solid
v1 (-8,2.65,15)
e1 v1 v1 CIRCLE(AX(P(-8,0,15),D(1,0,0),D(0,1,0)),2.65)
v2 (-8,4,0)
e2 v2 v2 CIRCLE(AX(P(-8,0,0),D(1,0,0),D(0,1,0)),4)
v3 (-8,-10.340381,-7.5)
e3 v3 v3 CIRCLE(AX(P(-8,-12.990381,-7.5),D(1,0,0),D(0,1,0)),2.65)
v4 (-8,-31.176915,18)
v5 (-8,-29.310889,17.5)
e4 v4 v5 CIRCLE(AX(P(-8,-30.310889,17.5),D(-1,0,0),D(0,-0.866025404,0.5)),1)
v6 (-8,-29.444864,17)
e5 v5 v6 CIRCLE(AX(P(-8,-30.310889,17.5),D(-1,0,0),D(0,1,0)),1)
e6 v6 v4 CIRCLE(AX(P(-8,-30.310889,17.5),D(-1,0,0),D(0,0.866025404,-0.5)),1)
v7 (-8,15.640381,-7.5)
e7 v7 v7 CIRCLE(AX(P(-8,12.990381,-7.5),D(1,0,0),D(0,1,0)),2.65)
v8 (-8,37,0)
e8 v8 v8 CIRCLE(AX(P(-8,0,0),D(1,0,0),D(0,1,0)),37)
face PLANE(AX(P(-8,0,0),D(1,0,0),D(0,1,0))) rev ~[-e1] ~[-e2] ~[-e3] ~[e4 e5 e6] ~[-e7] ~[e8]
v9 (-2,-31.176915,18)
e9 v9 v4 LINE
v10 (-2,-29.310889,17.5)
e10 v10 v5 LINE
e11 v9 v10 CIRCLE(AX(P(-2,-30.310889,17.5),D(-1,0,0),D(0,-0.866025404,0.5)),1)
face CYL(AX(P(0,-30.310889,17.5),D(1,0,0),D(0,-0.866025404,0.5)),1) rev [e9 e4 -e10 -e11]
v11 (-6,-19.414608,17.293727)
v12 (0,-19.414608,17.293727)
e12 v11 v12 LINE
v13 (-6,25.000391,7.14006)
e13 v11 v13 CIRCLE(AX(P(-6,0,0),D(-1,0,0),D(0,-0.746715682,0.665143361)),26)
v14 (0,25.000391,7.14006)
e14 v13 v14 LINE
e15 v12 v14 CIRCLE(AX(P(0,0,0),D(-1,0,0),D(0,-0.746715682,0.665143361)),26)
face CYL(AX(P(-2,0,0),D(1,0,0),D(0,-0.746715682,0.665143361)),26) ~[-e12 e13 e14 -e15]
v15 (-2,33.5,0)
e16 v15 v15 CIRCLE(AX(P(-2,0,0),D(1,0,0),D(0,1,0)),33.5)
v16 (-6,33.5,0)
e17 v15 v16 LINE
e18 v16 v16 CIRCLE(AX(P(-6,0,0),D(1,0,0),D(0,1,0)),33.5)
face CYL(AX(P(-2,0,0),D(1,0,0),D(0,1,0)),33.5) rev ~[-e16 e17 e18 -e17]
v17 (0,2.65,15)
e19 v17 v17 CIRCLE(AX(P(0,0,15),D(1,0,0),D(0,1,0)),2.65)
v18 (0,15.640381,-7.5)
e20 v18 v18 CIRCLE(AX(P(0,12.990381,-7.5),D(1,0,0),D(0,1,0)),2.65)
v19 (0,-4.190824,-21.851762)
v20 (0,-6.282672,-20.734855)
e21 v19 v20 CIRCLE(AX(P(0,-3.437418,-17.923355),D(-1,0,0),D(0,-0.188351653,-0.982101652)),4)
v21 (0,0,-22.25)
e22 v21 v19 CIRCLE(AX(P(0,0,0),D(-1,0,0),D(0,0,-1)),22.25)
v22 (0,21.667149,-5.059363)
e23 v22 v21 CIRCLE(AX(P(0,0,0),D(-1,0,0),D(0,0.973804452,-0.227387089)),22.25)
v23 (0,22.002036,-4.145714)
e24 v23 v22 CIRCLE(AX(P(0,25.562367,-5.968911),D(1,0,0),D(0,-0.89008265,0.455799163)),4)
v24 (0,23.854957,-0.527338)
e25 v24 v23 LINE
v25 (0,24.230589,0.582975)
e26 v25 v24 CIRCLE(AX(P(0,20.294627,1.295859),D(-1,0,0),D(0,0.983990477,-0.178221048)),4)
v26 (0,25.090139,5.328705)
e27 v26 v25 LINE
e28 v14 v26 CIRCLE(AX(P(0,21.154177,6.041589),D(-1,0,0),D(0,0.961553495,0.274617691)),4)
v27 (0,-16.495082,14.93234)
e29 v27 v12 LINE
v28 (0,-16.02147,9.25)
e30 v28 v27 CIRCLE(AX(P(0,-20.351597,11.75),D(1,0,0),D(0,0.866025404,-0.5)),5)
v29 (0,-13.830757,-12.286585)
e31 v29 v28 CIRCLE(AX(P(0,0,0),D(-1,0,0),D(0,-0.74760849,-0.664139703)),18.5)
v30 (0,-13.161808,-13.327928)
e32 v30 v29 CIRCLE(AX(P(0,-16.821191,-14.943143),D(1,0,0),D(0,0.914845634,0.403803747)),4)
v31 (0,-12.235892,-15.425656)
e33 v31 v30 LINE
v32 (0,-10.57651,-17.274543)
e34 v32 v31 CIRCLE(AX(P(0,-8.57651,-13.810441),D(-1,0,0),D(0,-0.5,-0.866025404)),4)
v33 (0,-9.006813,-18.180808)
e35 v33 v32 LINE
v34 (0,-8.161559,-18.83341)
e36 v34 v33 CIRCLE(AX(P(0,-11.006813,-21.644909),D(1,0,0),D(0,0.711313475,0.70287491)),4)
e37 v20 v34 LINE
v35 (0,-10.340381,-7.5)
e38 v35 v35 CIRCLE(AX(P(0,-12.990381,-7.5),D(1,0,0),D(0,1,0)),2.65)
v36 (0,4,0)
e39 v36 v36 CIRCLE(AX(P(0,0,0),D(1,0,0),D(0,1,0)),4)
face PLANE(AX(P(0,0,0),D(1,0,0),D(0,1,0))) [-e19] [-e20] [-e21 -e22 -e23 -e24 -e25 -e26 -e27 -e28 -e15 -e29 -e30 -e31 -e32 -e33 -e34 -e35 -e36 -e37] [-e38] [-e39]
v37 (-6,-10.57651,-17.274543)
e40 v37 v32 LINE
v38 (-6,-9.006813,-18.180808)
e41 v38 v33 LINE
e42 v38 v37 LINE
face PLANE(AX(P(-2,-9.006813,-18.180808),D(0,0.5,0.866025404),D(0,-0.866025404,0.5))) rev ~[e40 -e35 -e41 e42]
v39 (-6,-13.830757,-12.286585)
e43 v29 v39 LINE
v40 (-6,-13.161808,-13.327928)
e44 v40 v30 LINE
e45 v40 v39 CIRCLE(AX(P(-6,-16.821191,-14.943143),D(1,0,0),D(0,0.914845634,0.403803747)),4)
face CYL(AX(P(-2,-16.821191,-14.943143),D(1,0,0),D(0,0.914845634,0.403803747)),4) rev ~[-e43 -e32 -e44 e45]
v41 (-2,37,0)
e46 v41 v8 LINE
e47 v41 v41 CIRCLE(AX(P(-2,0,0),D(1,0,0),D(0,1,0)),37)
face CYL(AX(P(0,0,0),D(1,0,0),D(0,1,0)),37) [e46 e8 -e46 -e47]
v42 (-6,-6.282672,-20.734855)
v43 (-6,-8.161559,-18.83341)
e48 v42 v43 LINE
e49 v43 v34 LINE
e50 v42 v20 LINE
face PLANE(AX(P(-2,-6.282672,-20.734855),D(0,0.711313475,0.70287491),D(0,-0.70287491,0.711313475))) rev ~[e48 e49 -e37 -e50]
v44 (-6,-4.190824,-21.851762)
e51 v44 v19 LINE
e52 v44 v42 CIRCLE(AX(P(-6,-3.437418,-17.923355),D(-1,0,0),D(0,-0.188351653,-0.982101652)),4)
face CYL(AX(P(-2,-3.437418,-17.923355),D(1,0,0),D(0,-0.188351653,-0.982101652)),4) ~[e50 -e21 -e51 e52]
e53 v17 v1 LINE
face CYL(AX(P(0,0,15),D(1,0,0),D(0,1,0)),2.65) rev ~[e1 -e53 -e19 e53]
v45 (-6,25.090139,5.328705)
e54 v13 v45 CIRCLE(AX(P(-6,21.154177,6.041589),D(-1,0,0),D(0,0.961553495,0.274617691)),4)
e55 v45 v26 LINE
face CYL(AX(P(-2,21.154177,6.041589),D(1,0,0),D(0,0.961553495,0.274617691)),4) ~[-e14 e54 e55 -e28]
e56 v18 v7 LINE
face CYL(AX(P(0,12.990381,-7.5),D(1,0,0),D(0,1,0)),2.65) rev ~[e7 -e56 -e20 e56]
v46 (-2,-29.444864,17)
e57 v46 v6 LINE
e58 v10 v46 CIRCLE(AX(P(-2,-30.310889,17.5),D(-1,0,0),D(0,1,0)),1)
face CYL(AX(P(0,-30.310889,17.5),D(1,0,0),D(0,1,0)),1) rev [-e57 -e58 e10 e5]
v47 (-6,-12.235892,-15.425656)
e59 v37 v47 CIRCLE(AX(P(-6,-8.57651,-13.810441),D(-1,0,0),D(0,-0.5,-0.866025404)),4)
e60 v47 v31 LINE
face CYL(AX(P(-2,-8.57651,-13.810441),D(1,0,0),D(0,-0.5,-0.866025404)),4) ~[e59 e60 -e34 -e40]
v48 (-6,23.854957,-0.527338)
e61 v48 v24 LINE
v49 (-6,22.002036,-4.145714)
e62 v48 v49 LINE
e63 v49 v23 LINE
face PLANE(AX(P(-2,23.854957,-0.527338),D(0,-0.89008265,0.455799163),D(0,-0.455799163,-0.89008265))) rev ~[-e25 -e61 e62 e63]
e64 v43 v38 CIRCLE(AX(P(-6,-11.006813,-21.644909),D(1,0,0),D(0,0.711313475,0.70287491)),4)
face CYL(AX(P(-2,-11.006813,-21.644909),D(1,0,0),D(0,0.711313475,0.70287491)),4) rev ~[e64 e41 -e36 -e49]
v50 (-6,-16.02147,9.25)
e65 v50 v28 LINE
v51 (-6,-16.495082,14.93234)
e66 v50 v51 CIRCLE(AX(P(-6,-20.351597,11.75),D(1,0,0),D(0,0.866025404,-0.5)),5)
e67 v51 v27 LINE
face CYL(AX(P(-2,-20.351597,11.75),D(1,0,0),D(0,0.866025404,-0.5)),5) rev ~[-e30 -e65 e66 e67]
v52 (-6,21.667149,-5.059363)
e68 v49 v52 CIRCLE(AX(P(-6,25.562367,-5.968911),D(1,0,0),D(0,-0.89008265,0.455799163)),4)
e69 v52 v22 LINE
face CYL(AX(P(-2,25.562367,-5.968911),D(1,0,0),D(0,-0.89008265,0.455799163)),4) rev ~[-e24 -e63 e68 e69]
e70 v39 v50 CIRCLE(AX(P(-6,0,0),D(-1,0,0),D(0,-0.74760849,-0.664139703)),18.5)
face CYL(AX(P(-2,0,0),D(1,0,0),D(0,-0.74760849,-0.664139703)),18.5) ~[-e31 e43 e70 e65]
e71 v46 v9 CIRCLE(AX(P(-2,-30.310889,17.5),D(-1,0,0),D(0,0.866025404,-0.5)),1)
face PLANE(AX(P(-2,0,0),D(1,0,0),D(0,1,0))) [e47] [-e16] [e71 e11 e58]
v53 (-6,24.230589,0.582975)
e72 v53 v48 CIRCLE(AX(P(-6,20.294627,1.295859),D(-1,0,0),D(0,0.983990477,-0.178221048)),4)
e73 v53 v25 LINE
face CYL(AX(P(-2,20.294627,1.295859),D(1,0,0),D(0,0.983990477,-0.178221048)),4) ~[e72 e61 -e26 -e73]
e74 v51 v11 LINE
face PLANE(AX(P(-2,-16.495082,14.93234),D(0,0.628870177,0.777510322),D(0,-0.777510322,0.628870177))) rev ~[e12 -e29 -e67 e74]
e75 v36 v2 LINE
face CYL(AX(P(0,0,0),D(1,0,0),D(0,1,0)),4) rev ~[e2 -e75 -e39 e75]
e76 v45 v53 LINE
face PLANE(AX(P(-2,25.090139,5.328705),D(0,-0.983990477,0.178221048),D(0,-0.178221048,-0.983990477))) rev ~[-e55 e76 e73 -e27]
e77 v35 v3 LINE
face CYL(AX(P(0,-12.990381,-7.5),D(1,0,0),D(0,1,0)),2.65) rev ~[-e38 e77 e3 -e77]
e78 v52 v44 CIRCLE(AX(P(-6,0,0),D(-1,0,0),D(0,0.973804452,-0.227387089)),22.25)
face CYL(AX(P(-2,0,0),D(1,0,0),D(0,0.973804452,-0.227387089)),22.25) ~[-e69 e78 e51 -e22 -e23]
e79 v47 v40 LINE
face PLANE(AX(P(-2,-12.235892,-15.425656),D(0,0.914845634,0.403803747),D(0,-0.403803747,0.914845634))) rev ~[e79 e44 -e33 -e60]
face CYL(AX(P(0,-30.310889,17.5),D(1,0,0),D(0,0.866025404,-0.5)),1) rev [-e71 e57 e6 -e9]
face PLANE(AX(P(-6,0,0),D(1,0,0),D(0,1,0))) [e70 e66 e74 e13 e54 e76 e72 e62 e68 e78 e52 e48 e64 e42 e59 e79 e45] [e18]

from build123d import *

# Parameters (mm, degrees)
F0_R     = 37
F0_R_2   = 2.65
F0_R_3   = 4
F1_DEPTH = 8
F2_DEPTH = 2
F3_R     = 33.5
F4_DEPTH = 4


# Not quite as in the source:
# - a feature names something its author has since deleted; it is built from what else it names


with BuildPart() as f1:
    # F0 (on Right) → F1 (new body)
    with BuildSketch(Plane.YZ):
        Circle(F0_R)
        with BuildLine():
            ThreePointArc((-31.1769145362, 18), (-30.0520700874, 18.4659258263), (-29.3108891325, 17.5))
            ThreePointArc((-29.3108891325, 17.5), (-29.3449633062, 17.2411809549), (-29.4448637287, 17))
            ThreePointArc((-29.4448637287, 17), (-30.8108891325, 16.6339745962), (-31.1769145362, 18))
        make_face(mode=Mode.SUBTRACT)
        with BuildLine():
            ThreePointArc((-13.8307570654, -12.2865845131), (-18.4050260219, -1.8721690986), (-16.02146997, 9.25))
            ThreePointArc((-16.02146997, 9.25), (-15.3688742415, 12.1652999186), (-16.4950815942, 14.9323401783))
            Line((-16.4950815942, 14.9323401783), (-19.414607735, 17.2937273743))
            ThreePointArc((-19.414607735, 17.2937273743), (5.7943493018, 25.3461144195), (25.0003908736, 7.1400599553))
            ThreePointArc((25.0003908736, 7.1400599553), (25.1492760253, 6.2395359628), (25.0901387998, 5.3287050027))
            Line((25.0901387998, 5.3287050027), (24.230588756, 0.582974524))
            ThreePointArc((24.230588756, 0.582974524), (24.0836635039, 0.0139846058), (23.8549574473, -0.527337938))
            Line((23.8549574473, -0.527337938), (22.0020362781, -4.1457144451))
            ThreePointArc((22.0020362781, -4.1457144451), (21.8067059734, -4.5923170456), (21.6671490665, -5.0593627397))
            ThreePointArc((21.6671490665, -5.0593627397), (13.8291662627, -17.4303373599), (0, -22.25))
            ThreePointArc((0, -22.25), (-2.1048516517, -22.1502166925), (-4.1908242867, -21.851761755))
            ThreePointArc((-4.1908242867, -21.851761755), (-5.3214186468, -21.4518874672), (-6.2826715748, -20.7348547893))
            Line((-6.2826715748, -20.7348547893), (-8.1615589997, -18.8334098464))
            ThreePointArc((-8.1615589997, -18.8334098464), (-8.5623101549, -18.4787752012), (-9.0068129011, -18.1808078731))
            Line((-9.0068129011, -18.1808078731), (-10.5765097016, -17.2745430028))
            ThreePointArc((-10.5765097016, -17.2745430028), (-11.5533785454, -16.4821921034), (-12.2358922377, -15.4256563749))
            Line((-12.2358922377, -15.4256563749), (-13.1618084894, -13.3279283396))
            ThreePointArc((-13.1618084894, -13.3279283396), (-13.4557617662, -12.781226145), (-13.8307570654, -12.2865845131))
        make_face(mode=Mode.SUBTRACT)
        with BuildLine():
            ThreePointArc((-16.4950815942, 14.9323401783), (-15.3688742415, 12.1652999186), (-16.02146997, 9.25))
            ThreePointArc((-16.02146997, 9.25), (-18.4050260219, -1.8721690986), (-13.8307570654, -12.2865845131))
            ThreePointArc((-13.8307570654, -12.2865845131), (-13.4557617662, -12.781226145), (-13.1618084894, -13.3279283396))
            Line((-13.1618084894, -13.3279283396), (-12.2358922377, -15.4256563749))
            ThreePointArc((-12.2358922377, -15.4256563749), (-11.5533785454, -16.4821921034), (-10.5765097016, -17.2745430028))
            Line((-10.5765097016, -17.2745430028), (-9.0068129011, -18.1808078731))
            ThreePointArc((-9.0068129011, -18.1808078731), (-8.5623101549, -18.4787752012), (-8.1615589997, -18.8334098464))
            Line((-8.1615589997, -18.8334098464), (-6.2826715748, -20.7348547893))
            ThreePointArc((-6.2826715748, -20.7348547893), (-5.3214186468, -21.4518874672), (-4.1908242867, -21.851761755))
            ThreePointArc((-4.1908242867, -21.851761755), (-2.1048516517, -22.1502166925), (0, -22.25))
            ThreePointArc((0, -22.25), (13.8291662627, -17.4303373599), (21.6671490665, -5.0593627397))
            ThreePointArc((21.6671490665, -5.0593627397), (21.8067059734, -4.5923170456), (22.0020362781, -4.1457144451))
            Line((22.0020362781, -4.1457144451), (23.8549574473, -0.527337938))
            ThreePointArc((23.8549574473, -0.527337938), (24.0836635039, 0.0139846058), (24.230588756, 0.582974524))
            Line((24.230588756, 0.582974524), (25.0901387998, 5.3287050027))
            ThreePointArc((25.0901387998, 5.3287050027), (25.1492760253, 6.2395359628), (25.0003908736, 7.1400599553))
            ThreePointArc((25.0003908736, 7.1400599553), (5.7943493018, 25.3461144195), (-19.414607735, 17.2937273743))
            Line((-19.414607735, 17.2937273743), (-16.4950815942, 14.9323401783))
        make_face()
        with Locations((-12.9903810568, -7.5)):
            Circle(F0_R_2, mode=Mode.SUBTRACT)
        with Locations((12.9903810568, -7.5)):
            Circle(F0_R_2, mode=Mode.SUBTRACT)
        Circle(F0_R_3, mode=Mode.SUBTRACT)
        with Locations((0, 15)):
            Circle(F0_R_2, mode=Mode.SUBTRACT)
    extrude(amount=-F1_DEPTH)

    # F0 (on Right) → F2 (cut)
    with BuildSketch(Plane.YZ):
        Circle(F0_R)
        with BuildLine():
            ThreePointArc((-31.1769145362, 18), (-30.0520700874, 18.4659258263), (-29.3108891325, 17.5))
            ThreePointArc((-29.3108891325, 17.5), (-29.3449633062, 17.2411809549), (-29.4448637287, 17))
            ThreePointArc((-29.4448637287, 17), (-30.8108891325, 16.6339745962), (-31.1769145362, 18))
        make_face(mode=Mode.SUBTRACT)
        with BuildLine():
            ThreePointArc((-13.8307570654, -12.2865845131), (-18.4050260219, -1.8721690986), (-16.02146997, 9.25))
            ThreePointArc((-16.02146997, 9.25), (-15.3688742415, 12.1652999186), (-16.4950815942, 14.9323401783))
            Line((-16.4950815942, 14.9323401783), (-19.414607735, 17.2937273743))
            ThreePointArc((-19.414607735, 17.2937273743), (5.7943493018, 25.3461144195), (25.0003908736, 7.1400599553))
            ThreePointArc((25.0003908736, 7.1400599553), (25.1492760253, 6.2395359628), (25.0901387998, 5.3287050027))
            Line((25.0901387998, 5.3287050027), (24.230588756, 0.582974524))
            ThreePointArc((24.230588756, 0.582974524), (24.0836635039, 0.0139846058), (23.8549574473, -0.527337938))
            Line((23.8549574473, -0.527337938), (22.0020362781, -4.1457144451))
            ThreePointArc((22.0020362781, -4.1457144451), (21.8067059734, -4.5923170456), (21.6671490665, -5.0593627397))
            ThreePointArc((21.6671490665, -5.0593627397), (13.8291662627, -17.4303373599), (0, -22.25))
            ThreePointArc((0, -22.25), (-2.1048516517, -22.1502166925), (-4.1908242867, -21.851761755))
            ThreePointArc((-4.1908242867, -21.851761755), (-5.3214186468, -21.4518874672), (-6.2826715748, -20.7348547893))
            Line((-6.2826715748, -20.7348547893), (-8.1615589997, -18.8334098464))
            ThreePointArc((-8.1615589997, -18.8334098464), (-8.5623101549, -18.4787752012), (-9.0068129011, -18.1808078731))
            Line((-9.0068129011, -18.1808078731), (-10.5765097016, -17.2745430028))
            ThreePointArc((-10.5765097016, -17.2745430028), (-11.5533785454, -16.4821921034), (-12.2358922377, -15.4256563749))
            Line((-12.2358922377, -15.4256563749), (-13.1618084894, -13.3279283396))
            ThreePointArc((-13.1618084894, -13.3279283396), (-13.4557617662, -12.781226145), (-13.8307570654, -12.2865845131))
        make_face(mode=Mode.SUBTRACT)
    extrude(amount=-F2_DEPTH, mode=Mode.SUBTRACT)

    # F3 (on face) → F4 (cut)
    with BuildSketch(Plane.YZ.offset(-2)):
        Circle(F3_R)
        with BuildLine():
            ThreePointArc((-13.8307570654, -12.2865845131), (-18.4050260219, -1.8721690986), (-16.02146997, 9.25))
            ThreePointArc((-16.02146997, 9.25), (-15.3688742415, 12.1652999186), (-16.4950815942, 14.9323401783))
            Line((-16.4950815942, 14.9323401783), (-19.414607735, 17.2937273743))
            ThreePointArc((-19.414607735, 17.2937273743), (5.7943493018, 25.3461144195), (25.0003908736, 7.1400599553))
            ThreePointArc((25.0003908736, 7.1400599553), (25.1492760253, 6.2395359628), (25.0901387998, 5.3287050027))
            Line((25.0901387998, 5.3287050027), (24.230588756, 0.582974524))
            ThreePointArc((24.230588756, 0.582974524), (24.0836635039, 0.0139846058), (23.8549574473, -0.527337938))
            Line((23.8549574473, -0.527337938), (22.0020362781, -4.1457144451))
            ThreePointArc((22.0020362781, -4.1457144451), (21.8067059734, -4.5923170456), (21.6671490665, -5.0593627397))
            ThreePointArc((21.6671490665, -5.0593627397), (12.1182361804, -18.6604086739), (-4.1908242867, -21.851761755))
            ThreePointArc((-4.1908242867, -21.851761755), (-5.3214186468, -21.4518874672), (-6.2826715748, -20.7348547893))
            Line((-6.2826715748, -20.7348547893), (-8.1615589997, -18.8334098464))
            ThreePointArc((-8.1615589997, -18.8334098464), (-8.5623101549, -18.4787752012), (-9.0068129011, -18.1808078731))
            Line((-9.0068129011, -18.1808078731), (-10.5765097016, -17.2745430028))
            ThreePointArc((-10.5765097016, -17.2745430028), (-11.5533785454, -16.4821921034), (-12.2358922377, -15.4256563749))
            Line((-12.2358922377, -15.4256563749), (-13.1618084894, -13.3279283396))
            ThreePointArc((-13.1618084894, -13.3279283396), (-13.4557617662, -12.781226145), (-13.8307570654, -12.2865845131))
        make_face(mode=Mode.SUBTRACT)
    extrude(amount=-F4_DEPTH, mode=Mode.SUBTRACT)


solid = f1.part
